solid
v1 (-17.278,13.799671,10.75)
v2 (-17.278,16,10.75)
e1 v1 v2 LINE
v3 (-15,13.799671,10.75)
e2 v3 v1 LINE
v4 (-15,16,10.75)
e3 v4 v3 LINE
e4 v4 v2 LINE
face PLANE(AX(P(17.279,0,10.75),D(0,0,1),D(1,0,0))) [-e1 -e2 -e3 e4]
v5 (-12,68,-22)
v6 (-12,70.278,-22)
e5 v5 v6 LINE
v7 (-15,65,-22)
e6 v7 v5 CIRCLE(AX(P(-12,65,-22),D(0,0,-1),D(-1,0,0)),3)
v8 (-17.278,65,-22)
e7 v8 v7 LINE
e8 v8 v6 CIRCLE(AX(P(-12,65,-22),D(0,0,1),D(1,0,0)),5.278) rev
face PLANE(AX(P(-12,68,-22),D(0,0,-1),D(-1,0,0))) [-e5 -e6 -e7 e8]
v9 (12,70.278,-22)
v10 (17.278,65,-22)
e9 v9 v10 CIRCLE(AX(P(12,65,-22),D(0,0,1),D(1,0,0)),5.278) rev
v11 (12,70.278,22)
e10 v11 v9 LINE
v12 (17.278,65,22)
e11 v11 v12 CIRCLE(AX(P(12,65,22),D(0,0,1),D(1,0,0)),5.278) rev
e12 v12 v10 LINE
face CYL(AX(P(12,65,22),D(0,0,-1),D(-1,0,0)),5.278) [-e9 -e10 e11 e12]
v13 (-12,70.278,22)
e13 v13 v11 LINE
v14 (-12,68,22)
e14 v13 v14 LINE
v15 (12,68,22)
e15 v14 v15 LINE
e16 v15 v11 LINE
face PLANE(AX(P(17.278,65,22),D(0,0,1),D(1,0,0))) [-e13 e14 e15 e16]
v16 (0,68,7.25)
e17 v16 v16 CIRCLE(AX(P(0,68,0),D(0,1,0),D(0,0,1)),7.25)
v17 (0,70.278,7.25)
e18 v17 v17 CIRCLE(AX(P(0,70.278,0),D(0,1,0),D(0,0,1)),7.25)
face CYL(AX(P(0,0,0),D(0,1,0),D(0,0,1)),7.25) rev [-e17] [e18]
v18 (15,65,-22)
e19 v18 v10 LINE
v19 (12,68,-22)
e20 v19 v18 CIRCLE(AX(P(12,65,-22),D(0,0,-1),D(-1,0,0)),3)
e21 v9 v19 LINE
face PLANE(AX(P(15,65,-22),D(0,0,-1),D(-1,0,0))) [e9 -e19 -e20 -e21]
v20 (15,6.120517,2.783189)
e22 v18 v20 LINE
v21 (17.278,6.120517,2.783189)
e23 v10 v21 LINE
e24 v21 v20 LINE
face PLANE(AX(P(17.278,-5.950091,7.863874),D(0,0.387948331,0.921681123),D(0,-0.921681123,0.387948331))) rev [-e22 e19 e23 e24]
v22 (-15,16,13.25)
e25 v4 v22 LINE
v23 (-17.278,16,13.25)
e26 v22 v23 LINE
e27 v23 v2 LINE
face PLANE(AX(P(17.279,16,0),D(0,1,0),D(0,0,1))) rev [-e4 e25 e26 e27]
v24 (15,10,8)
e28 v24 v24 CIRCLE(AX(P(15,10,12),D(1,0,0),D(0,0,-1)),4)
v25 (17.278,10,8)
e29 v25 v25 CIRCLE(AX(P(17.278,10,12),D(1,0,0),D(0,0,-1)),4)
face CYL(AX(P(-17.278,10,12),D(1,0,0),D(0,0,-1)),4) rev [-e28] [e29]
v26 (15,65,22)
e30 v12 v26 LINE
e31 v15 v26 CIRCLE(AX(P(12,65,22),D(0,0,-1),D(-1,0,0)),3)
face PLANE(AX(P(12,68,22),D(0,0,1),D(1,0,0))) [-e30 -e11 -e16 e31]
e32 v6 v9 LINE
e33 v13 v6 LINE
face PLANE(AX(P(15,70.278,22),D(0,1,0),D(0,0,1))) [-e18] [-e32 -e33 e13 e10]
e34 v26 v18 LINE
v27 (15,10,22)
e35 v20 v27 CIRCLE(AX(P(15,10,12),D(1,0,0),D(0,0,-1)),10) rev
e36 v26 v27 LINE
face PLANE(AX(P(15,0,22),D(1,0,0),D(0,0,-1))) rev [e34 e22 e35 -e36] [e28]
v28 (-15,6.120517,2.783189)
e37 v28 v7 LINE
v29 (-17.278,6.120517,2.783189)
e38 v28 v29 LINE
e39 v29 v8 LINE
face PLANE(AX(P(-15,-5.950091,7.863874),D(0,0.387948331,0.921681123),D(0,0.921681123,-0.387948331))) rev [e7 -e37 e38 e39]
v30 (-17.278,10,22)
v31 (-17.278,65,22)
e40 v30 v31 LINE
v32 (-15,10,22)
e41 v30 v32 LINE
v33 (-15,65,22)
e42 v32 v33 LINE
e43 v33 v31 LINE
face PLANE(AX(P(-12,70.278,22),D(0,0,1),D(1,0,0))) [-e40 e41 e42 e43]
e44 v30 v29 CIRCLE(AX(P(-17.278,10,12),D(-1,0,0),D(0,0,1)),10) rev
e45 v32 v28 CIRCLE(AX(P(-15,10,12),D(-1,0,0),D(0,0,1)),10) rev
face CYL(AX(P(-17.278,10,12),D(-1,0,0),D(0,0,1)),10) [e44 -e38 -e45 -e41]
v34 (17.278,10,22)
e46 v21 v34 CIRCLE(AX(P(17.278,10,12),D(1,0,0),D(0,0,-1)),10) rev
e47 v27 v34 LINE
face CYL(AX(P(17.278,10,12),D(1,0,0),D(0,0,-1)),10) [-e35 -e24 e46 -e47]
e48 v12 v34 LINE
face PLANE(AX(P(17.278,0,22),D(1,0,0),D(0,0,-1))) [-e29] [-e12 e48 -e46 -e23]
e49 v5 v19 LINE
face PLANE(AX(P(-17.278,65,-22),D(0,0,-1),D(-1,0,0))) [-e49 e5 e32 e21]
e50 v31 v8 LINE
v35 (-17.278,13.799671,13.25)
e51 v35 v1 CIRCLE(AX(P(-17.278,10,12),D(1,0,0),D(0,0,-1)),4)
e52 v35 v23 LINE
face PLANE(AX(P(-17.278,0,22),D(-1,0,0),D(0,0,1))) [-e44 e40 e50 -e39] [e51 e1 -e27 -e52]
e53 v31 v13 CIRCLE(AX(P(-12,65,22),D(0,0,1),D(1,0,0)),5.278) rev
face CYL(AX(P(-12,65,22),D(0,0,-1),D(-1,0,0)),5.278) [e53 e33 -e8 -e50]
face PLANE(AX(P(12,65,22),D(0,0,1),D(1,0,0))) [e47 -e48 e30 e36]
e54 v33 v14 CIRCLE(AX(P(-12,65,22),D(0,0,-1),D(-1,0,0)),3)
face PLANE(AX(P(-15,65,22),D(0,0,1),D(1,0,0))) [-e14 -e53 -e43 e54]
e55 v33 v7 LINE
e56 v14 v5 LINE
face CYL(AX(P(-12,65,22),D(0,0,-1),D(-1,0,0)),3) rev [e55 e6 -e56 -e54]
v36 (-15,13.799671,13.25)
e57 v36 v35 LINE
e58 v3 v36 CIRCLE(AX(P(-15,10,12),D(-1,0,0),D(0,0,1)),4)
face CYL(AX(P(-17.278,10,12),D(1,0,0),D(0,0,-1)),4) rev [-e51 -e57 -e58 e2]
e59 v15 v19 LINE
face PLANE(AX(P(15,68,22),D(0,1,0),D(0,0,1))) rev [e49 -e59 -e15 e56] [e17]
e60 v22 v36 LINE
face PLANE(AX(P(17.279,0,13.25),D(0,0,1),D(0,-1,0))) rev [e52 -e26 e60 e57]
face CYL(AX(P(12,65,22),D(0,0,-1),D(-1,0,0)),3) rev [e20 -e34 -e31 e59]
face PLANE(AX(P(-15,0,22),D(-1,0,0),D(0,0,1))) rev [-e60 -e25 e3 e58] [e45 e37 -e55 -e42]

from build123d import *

# Parameters (mm, degrees)
BASE_FLANGE1_DEPTH = 22
CUT_EXTRUDE2_START = -34.556
CUT_EXTRUDE2_DEPTH = 34.556
SKETCH9_R          = 4
CUT_EXTRUDE3_DEPTH = 82.345647825
SKETCH10_R         = 7.25
CUT_EXTRUDE4_DEPTH = 76.640773185
CUT_EXTRUDE5_REACH = 83.346


# Read off the part's stored shape, not the designer's step: Cut-Extrude2
# Sheet-metal steps are written as plain solids
with BuildPart() as part:
    # Sketch2 → Base-Flange1 (new, symmetric)
    with BuildSketch(Plane.XY):
        with BuildLine():
            Line((15, 0), (15, 65))
            ThreePointArc((15, 65), (14.121320344, 67.121320344), (12, 68))
            Line((12, 68), (-12, 68))
            ThreePointArc((-12, 68), (-14.121320344, 67.121320344), (-15, 65))
            Line((-15, 65), (-15, 0))
            Line((-15, 0), (-17.278, 0))
            Line((-17.278, 0), (-17.278, 65))
            ThreePointArc((-17.278, 65), (-15.732109591, 68.732109591), (-12, 70.278))
            Line((-12, 70.278), (12, 70.278))
            ThreePointArc((12, 70.278), (15.732109591, 68.732109591), (17.278, 65))
            Line((17.278, 65), (17.278, 0))
            Line((17.278, 0), (15, 0))
        make_face()
    extrude(amount=BASE_FLANGE1_DEPTH, both=True)

    # Cut-Extrude2 outline → Cut-Extrude2 (cut)
    with BuildSketch(Plane(origin=(17.278, 0, 0), x_dir=(0, 0, -1), z_dir=(1, 0, 0)).offset(CUT_EXTRUDE2_START)):
        with BuildLine():
            Line((22, 65), (-2.783188769, 6.120516693))
            ThreePointArc((-2.783188769, 6.120516693), (-6.468039819, 1.669488818), (-12.000000004, 0))
            Line((-12.000000004, 0), (22, 0))
            Line((22, 0), (22, 65))
        make_face()
        with BuildLine():
            Line((-22, 0), (-12.000000004, 0))
            ThreePointArc((-12.000000004, 0), (-19.071067813, 2.92893219), (-22, 10))
            Line((-22, 10), (-22, 0))
        make_face()
    extrude(amount=CUT_EXTRUDE2_DEPTH, mode=Mode.SUBTRACT)

    # Sketch9 → Cut-Extrude3 (cut, through all)
    with BuildSketch(Plane(origin=(17.278, 0, 0), x_dir=(0, 0, -1), z_dir=(1, 0, 0))):
        with Locations((-12, 10)):
            Circle(SKETCH9_R)
    extrude(amount=-CUT_EXTRUDE3_DEPTH, mode=Mode.SUBTRACT)

    # Sketch10 → Cut-Extrude4 (cut, through all)
    with BuildSketch(Plane(origin=(0, 70.278, 0), x_dir=(1, 0, 0), z_dir=(0, 1, 0))):
        with Locations(Location((0, 0, 0), (0, 0, 270))):
            Circle(SKETCH10_R)
    extrude(amount=-CUT_EXTRUDE4_DEPTH, mode=Mode.SUBTRACT)

    # Sketch13 → Cut-Extrude5 (cut, up to next)
    with BuildSketch(Plane.ZY.offset(17.278), mode=Mode.PRIVATE) as cut_extrude5_sk1:
        with BuildLine():
            ThreePointArc((10.75, 13.799671038), (12, 14), (13.25, 13.799671038))
            Line((13.25, 13.799671038), (13.25, 16))
            Line((13.25, 16), (10.75, 16))
            Line((10.75, 16), (10.75, 13.799671038))
        make_face()
    cut_extrude5_tool1 = extrude(cut_extrude5_sk1.sketch, amount=-CUT_EXTRUDE5_REACH, mode=Mode.PRIVATE) & part.part
    add(cut_extrude5_tool1.solids().sort_by_distance((-17.278, 14.966097, 12))[0], mode=Mode.SUBTRACT)


solid = part.part
